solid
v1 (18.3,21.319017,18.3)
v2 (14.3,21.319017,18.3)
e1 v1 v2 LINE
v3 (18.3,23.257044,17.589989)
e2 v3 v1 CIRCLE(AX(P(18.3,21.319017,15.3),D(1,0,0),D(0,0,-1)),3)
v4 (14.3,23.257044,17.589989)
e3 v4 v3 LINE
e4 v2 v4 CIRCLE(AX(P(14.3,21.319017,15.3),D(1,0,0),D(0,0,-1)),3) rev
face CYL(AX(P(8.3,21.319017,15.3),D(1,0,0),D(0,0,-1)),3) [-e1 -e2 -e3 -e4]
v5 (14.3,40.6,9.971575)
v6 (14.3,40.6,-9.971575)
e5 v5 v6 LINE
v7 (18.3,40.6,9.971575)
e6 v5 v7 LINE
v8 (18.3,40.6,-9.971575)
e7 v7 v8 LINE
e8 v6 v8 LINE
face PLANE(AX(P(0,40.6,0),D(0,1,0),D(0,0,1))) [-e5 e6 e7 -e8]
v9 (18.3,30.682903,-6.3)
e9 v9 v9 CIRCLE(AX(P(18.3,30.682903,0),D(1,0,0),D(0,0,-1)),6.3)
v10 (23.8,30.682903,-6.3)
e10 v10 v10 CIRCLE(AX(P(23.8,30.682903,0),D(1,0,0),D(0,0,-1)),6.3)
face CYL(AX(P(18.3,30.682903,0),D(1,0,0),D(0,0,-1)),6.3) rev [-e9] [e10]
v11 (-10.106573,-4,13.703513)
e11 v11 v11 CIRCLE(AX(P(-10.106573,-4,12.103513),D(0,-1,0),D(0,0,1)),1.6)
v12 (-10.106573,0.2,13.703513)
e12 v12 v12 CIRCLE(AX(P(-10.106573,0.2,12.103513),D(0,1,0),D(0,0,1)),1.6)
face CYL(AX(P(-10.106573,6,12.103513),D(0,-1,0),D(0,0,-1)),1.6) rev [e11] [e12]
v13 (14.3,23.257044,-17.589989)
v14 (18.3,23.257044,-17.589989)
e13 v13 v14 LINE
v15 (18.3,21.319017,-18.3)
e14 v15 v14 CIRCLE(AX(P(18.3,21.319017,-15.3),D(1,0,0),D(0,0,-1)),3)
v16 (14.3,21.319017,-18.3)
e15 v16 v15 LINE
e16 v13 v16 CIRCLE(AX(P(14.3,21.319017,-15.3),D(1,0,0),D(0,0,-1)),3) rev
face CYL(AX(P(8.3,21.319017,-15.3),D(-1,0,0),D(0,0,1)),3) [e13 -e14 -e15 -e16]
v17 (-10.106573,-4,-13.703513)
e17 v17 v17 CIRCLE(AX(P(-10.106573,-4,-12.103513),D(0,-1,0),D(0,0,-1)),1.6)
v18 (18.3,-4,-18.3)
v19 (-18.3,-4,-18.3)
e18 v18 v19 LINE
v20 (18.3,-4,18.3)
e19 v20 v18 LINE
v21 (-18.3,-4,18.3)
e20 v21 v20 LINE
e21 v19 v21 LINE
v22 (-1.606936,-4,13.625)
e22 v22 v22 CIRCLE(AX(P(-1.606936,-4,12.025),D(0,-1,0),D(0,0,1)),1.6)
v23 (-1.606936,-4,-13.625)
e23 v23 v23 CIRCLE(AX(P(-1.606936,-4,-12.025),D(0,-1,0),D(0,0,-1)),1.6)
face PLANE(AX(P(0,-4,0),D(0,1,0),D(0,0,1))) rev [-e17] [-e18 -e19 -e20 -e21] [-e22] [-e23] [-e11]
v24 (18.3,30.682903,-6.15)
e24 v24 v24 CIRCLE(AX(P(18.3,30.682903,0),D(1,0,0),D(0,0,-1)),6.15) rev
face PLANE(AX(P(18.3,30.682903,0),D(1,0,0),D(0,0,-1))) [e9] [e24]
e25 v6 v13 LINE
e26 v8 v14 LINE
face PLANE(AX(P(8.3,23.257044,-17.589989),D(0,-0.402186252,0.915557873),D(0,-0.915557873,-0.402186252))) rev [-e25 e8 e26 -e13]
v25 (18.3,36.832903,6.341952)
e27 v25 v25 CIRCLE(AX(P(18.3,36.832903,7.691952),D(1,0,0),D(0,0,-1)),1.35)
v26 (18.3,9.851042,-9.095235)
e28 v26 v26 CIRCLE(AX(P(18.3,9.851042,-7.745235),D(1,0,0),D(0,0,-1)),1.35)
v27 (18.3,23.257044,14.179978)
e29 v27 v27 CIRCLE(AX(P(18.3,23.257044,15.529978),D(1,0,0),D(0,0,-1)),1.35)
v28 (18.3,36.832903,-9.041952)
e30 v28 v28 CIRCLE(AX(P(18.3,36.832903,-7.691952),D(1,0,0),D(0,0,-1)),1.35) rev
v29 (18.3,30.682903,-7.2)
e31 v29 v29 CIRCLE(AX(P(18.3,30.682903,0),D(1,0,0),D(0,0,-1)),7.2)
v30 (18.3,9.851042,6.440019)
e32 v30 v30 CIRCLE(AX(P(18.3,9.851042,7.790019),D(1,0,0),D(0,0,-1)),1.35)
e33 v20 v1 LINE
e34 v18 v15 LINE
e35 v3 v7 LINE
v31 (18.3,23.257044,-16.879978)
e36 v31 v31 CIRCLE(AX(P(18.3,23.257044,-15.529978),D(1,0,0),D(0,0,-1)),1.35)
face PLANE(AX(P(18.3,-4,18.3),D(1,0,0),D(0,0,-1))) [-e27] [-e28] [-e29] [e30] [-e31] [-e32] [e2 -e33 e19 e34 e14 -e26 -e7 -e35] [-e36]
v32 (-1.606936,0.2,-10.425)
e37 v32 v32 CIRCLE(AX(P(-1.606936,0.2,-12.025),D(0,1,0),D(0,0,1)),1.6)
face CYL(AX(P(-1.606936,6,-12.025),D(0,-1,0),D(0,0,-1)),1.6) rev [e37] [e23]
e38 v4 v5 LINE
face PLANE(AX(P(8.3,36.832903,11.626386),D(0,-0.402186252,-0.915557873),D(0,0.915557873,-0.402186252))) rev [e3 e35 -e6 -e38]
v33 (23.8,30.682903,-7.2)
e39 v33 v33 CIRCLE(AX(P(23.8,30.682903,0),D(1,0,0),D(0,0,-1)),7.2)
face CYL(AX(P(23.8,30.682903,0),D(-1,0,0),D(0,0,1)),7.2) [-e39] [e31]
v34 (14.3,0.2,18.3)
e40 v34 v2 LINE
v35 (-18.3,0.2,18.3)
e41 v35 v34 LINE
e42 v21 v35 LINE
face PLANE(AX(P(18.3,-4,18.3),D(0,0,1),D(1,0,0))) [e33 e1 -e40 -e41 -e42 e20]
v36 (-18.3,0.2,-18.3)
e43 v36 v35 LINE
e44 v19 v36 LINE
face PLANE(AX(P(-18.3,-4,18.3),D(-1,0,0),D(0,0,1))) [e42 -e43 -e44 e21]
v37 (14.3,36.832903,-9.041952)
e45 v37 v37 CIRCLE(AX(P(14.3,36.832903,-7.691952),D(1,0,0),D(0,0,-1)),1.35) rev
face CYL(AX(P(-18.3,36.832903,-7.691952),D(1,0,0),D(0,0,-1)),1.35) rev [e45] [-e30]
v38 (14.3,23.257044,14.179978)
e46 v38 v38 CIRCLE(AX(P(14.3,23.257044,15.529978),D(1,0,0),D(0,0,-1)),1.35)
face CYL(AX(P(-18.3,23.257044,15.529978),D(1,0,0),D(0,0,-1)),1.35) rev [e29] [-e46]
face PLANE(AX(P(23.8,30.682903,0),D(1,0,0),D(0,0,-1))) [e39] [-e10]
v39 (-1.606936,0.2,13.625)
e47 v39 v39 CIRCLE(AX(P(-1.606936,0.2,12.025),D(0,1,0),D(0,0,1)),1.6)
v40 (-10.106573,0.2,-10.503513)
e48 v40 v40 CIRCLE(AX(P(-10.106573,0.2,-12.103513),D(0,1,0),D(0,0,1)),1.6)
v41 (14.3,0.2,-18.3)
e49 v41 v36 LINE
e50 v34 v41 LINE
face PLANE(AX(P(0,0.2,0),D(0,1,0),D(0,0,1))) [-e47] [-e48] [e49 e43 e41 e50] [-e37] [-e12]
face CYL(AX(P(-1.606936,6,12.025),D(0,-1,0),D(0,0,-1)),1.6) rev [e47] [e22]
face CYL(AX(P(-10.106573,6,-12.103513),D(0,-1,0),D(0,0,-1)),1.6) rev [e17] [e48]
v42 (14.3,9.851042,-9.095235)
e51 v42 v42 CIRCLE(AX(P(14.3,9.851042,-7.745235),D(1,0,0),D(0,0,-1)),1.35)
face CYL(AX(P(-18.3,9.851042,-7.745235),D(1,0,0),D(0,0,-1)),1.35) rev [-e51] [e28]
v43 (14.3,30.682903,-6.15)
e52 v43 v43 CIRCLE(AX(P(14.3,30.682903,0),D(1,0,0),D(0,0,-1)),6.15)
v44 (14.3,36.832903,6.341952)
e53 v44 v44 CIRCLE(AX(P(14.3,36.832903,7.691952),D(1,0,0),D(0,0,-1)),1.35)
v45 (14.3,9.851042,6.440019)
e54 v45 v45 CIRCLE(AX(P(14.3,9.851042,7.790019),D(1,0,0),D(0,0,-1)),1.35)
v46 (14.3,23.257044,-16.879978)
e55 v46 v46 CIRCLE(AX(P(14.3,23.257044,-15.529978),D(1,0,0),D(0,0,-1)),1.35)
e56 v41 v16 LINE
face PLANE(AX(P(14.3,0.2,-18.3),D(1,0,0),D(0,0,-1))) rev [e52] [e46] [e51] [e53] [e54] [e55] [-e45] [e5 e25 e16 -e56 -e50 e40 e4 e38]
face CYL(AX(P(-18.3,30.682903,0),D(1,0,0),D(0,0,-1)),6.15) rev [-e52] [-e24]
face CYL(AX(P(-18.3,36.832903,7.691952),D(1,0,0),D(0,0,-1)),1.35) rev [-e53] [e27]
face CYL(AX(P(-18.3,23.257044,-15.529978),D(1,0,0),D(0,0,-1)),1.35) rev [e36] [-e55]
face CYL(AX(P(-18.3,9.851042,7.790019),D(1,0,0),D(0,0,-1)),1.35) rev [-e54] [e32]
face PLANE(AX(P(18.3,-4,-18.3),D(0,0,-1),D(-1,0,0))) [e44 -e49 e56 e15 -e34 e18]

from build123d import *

# Parameters (mm, degrees)
EXTRUDE_1_DEPTH      = 40.6
EXTRUDE_1_DEPTH_BACK = 4
SKETCH_1_W           = 36.6
SKETCH_1_H           = 36.6
SKETCH_2_W           = 32.6
SKETCH_2_H           = 36.6
CUT_EXTRUDE_1_DEPTH  = 40.4
SKETCH_3_R           = 6.15
SKETCH_3_R_2         = 1.35
CUT_EXTRUDE_5_DEPTH  = 36.6
FILLET_2_R           = 2
SKETCH_7_R           = 1.6
CUT_EXTRUDE_6_DEPTH  = 10
CUT_EXTRUDE_8_DEPTH  = 10
FILLET_5_R           = 3
FILLET_6_R           = 3
SKETCH_17_R          = 7.2
EXTRUDE_2_DEPTH      = 5.5
SKETCH_18_R          = 6.3
CUT_EXTRUDE_9_DEPTH  = 5.5


with BuildPart() as part:
    # 草图1 → 凸台-拉伸1 (new, two sides: drawn at the far end of the back side and taken through both)
    with BuildSketch(Plane(origin=(0, 0, 0), x_dir=(1, 0, 0), z_dir=(0, 1, 0)).offset(-EXTRUDE_1_DEPTH_BACK)):
        Rectangle(SKETCH_1_W, SKETCH_1_H)
    extrude(amount=EXTRUDE_1_DEPTH + EXTRUDE_1_DEPTH_BACK)

    # 草图2 → 切除-拉伸1 (cut)
    with BuildSketch(Plane(origin=(0, 40.6, 0), x_dir=(1, 0, 0), z_dir=(0, 1, 0))):
        with Locations((-2, 0)):
            Rectangle(SKETCH_2_W, SKETCH_2_H)
    extrude(amount=-CUT_EXTRUDE_1_DEPTH, mode=Mode.SUBTRACT)

    # 草图3 → 切除-拉伸5 (cut)
    with BuildSketch(Plane(origin=(18.3, 0, 0), x_dir=(0, 0, -1), z_dir=(1, 0, 0))):
        with Locations((0, 30.682903148)):
            Circle(SKETCH_3_R)
        with Locations((-7.691951836, 36.832903148)):
            Circle(SKETCH_3_R_2)
        with Locations((7.691951836, 36.832903148)):
            Circle(SKETCH_3_R_2)
        with Locations((-15.529977583, 23.257044321)):
            Circle(SKETCH_3_R_2)
        with Locations((15.529977583, 23.257044321)):
            Circle(SKETCH_3_R_2)
        with Locations((7.745235234, 9.85104245)):
            Circle(SKETCH_3_R_2)
        with Locations((-7.790018794, 9.85104245)):
            Circle(SKETCH_3_R_2)
    extrude(amount=-CUT_EXTRUDE_5_DEPTH, mode=Mode.SUBTRACT)

    # 圆角2
    fillet_2_edges = [part.edges().sort_by_distance(p)[0] for p in [
        (16.3, 40.6, -18.3),
        (16.3, 40.6, 18.3),
    ]]
    fillet(fillet_2_edges, radius=FILLET_2_R)

    # 草图7 → 切除-拉伸6 (cut)
    with BuildSketch(Plane(origin=(0, -4, 0), x_dir=(-1, 0, 0), z_dir=(0, -1, 0))):
        with Locations(Location((1.606935512, 12.025, 0), (0, 0, 90))):
            Circle(SKETCH_7_R)
        with Locations(Location((10.106572894, 12.103513479, 0), (0, 0, 90))):
            Circle(SKETCH_7_R)
        with Locations(Location((10.106572894, -12.103513479, 0), (0, 0, 270))):
            Circle(SKETCH_7_R)
        with Locations(Location((1.606935512, -12.025, 0), (0, 0, 270))):
            Circle(SKETCH_7_R)
    extrude(amount=-CUT_EXTRUDE_6_DEPTH, mode=Mode.SUBTRACT)

    # 草图12 → 切除-拉伸8 (cut)
    with BuildSketch(Plane(origin=(18.3, 0, 0), x_dir=(0, 0, -1), z_dir=(1, 0, 0))):
        Polygon((-17.589988792, 23.257044321), (-11.626385684, 36.832903148), (-9.971575423, 40.6), (-18.3, 40.6), (-18.3, 23.257044321), align=None)
        Polygon((18.3, 23.257044321), (18.3, 40.6), (9.971575423, 40.6), (11.626385684, 36.832903148), (17.589988792, 23.257044321), align=None)
    extrude(amount=-CUT_EXTRUDE_8_DEPTH, mode=Mode.SUBTRACT)

    # 圆角5
    # the kernel refuses this fillet: 3 mm, written as the material it takes off along each edge
    with BuildSketch(Plane(origin=(23.145069229, 23.257044321, 18.3), x_dir=(0, -1, 0), z_dir=(-1, 0, 0))) as fillet_5_piece_1:
        with BuildLine():
            CenterArc((1.938027692, -3), FILLET_5_R, 90, 40.241386347)
            Line((0, -0.710011208), (-0.038760554, -0.664211432))
            ThreePointArc((-0.038760554, -0.664211432), (-0.06, -0.355005604), (-0.06, 0))
            Line((-0.06, 0), (0, 0.06))
            Line((0, 0.06), (1.938027692, 0.06))
            Line((1.938027692, 0.06), (1.938027692, 0))
        make_face()
    extrude(amount=13.690138458, mode=Mode.SUBTRACT)

    # 圆角6
    # the kernel refuses this fillet: 3 mm, written as the material it takes off along each edge
    with BuildSketch(Plane(origin=(23.145069229, 23.257044321, -18.3), x_dir=(0, -1, 0), z_dir=(-1, 0, 0))) as fillet_6_piece_1:
        with BuildLine():
            CenterArc((1.938027692, 3), FILLET_6_R, 229.758613653, 40.241386347)
            Line((0, 0.710011208), (-0.038760554, 0.664211432))
            ThreePointArc((-0.038760554, 0.664211432), (-0.06, 0.355005604), (-0.06, 0))
            Line((-0.06, 0), (0, -0.06))
            Line((0, -0.06), (1.938027692, -0.06))
            Line((1.938027692, -0.06), (1.938027692, 0))
        make_face()
    extrude(amount=13.690138458, mode=Mode.SUBTRACT)

    # 草图17 → 凸台-拉伸2 (add)
    with BuildSketch(Plane(origin=(18.3, 0, 0), x_dir=(0, 0, -1), z_dir=(1, 0, 0))):
        with Locations((0, 30.682903148)):
            Circle(SKETCH_17_R)
    extrude(amount=EXTRUDE_2_DEPTH)

    # 草图18 → 切除-拉伸9 (cut)
    with BuildSketch(Plane(origin=(23.8, 0, 0), x_dir=(0, 0, -1), z_dir=(1, 0, 0))):
        with Locations((0, 30.682903148)):
            Circle(SKETCH_18_R)
    extrude(amount=-CUT_EXTRUDE_9_DEPTH, mode=Mode.SUBTRACT)


solid = part.part
